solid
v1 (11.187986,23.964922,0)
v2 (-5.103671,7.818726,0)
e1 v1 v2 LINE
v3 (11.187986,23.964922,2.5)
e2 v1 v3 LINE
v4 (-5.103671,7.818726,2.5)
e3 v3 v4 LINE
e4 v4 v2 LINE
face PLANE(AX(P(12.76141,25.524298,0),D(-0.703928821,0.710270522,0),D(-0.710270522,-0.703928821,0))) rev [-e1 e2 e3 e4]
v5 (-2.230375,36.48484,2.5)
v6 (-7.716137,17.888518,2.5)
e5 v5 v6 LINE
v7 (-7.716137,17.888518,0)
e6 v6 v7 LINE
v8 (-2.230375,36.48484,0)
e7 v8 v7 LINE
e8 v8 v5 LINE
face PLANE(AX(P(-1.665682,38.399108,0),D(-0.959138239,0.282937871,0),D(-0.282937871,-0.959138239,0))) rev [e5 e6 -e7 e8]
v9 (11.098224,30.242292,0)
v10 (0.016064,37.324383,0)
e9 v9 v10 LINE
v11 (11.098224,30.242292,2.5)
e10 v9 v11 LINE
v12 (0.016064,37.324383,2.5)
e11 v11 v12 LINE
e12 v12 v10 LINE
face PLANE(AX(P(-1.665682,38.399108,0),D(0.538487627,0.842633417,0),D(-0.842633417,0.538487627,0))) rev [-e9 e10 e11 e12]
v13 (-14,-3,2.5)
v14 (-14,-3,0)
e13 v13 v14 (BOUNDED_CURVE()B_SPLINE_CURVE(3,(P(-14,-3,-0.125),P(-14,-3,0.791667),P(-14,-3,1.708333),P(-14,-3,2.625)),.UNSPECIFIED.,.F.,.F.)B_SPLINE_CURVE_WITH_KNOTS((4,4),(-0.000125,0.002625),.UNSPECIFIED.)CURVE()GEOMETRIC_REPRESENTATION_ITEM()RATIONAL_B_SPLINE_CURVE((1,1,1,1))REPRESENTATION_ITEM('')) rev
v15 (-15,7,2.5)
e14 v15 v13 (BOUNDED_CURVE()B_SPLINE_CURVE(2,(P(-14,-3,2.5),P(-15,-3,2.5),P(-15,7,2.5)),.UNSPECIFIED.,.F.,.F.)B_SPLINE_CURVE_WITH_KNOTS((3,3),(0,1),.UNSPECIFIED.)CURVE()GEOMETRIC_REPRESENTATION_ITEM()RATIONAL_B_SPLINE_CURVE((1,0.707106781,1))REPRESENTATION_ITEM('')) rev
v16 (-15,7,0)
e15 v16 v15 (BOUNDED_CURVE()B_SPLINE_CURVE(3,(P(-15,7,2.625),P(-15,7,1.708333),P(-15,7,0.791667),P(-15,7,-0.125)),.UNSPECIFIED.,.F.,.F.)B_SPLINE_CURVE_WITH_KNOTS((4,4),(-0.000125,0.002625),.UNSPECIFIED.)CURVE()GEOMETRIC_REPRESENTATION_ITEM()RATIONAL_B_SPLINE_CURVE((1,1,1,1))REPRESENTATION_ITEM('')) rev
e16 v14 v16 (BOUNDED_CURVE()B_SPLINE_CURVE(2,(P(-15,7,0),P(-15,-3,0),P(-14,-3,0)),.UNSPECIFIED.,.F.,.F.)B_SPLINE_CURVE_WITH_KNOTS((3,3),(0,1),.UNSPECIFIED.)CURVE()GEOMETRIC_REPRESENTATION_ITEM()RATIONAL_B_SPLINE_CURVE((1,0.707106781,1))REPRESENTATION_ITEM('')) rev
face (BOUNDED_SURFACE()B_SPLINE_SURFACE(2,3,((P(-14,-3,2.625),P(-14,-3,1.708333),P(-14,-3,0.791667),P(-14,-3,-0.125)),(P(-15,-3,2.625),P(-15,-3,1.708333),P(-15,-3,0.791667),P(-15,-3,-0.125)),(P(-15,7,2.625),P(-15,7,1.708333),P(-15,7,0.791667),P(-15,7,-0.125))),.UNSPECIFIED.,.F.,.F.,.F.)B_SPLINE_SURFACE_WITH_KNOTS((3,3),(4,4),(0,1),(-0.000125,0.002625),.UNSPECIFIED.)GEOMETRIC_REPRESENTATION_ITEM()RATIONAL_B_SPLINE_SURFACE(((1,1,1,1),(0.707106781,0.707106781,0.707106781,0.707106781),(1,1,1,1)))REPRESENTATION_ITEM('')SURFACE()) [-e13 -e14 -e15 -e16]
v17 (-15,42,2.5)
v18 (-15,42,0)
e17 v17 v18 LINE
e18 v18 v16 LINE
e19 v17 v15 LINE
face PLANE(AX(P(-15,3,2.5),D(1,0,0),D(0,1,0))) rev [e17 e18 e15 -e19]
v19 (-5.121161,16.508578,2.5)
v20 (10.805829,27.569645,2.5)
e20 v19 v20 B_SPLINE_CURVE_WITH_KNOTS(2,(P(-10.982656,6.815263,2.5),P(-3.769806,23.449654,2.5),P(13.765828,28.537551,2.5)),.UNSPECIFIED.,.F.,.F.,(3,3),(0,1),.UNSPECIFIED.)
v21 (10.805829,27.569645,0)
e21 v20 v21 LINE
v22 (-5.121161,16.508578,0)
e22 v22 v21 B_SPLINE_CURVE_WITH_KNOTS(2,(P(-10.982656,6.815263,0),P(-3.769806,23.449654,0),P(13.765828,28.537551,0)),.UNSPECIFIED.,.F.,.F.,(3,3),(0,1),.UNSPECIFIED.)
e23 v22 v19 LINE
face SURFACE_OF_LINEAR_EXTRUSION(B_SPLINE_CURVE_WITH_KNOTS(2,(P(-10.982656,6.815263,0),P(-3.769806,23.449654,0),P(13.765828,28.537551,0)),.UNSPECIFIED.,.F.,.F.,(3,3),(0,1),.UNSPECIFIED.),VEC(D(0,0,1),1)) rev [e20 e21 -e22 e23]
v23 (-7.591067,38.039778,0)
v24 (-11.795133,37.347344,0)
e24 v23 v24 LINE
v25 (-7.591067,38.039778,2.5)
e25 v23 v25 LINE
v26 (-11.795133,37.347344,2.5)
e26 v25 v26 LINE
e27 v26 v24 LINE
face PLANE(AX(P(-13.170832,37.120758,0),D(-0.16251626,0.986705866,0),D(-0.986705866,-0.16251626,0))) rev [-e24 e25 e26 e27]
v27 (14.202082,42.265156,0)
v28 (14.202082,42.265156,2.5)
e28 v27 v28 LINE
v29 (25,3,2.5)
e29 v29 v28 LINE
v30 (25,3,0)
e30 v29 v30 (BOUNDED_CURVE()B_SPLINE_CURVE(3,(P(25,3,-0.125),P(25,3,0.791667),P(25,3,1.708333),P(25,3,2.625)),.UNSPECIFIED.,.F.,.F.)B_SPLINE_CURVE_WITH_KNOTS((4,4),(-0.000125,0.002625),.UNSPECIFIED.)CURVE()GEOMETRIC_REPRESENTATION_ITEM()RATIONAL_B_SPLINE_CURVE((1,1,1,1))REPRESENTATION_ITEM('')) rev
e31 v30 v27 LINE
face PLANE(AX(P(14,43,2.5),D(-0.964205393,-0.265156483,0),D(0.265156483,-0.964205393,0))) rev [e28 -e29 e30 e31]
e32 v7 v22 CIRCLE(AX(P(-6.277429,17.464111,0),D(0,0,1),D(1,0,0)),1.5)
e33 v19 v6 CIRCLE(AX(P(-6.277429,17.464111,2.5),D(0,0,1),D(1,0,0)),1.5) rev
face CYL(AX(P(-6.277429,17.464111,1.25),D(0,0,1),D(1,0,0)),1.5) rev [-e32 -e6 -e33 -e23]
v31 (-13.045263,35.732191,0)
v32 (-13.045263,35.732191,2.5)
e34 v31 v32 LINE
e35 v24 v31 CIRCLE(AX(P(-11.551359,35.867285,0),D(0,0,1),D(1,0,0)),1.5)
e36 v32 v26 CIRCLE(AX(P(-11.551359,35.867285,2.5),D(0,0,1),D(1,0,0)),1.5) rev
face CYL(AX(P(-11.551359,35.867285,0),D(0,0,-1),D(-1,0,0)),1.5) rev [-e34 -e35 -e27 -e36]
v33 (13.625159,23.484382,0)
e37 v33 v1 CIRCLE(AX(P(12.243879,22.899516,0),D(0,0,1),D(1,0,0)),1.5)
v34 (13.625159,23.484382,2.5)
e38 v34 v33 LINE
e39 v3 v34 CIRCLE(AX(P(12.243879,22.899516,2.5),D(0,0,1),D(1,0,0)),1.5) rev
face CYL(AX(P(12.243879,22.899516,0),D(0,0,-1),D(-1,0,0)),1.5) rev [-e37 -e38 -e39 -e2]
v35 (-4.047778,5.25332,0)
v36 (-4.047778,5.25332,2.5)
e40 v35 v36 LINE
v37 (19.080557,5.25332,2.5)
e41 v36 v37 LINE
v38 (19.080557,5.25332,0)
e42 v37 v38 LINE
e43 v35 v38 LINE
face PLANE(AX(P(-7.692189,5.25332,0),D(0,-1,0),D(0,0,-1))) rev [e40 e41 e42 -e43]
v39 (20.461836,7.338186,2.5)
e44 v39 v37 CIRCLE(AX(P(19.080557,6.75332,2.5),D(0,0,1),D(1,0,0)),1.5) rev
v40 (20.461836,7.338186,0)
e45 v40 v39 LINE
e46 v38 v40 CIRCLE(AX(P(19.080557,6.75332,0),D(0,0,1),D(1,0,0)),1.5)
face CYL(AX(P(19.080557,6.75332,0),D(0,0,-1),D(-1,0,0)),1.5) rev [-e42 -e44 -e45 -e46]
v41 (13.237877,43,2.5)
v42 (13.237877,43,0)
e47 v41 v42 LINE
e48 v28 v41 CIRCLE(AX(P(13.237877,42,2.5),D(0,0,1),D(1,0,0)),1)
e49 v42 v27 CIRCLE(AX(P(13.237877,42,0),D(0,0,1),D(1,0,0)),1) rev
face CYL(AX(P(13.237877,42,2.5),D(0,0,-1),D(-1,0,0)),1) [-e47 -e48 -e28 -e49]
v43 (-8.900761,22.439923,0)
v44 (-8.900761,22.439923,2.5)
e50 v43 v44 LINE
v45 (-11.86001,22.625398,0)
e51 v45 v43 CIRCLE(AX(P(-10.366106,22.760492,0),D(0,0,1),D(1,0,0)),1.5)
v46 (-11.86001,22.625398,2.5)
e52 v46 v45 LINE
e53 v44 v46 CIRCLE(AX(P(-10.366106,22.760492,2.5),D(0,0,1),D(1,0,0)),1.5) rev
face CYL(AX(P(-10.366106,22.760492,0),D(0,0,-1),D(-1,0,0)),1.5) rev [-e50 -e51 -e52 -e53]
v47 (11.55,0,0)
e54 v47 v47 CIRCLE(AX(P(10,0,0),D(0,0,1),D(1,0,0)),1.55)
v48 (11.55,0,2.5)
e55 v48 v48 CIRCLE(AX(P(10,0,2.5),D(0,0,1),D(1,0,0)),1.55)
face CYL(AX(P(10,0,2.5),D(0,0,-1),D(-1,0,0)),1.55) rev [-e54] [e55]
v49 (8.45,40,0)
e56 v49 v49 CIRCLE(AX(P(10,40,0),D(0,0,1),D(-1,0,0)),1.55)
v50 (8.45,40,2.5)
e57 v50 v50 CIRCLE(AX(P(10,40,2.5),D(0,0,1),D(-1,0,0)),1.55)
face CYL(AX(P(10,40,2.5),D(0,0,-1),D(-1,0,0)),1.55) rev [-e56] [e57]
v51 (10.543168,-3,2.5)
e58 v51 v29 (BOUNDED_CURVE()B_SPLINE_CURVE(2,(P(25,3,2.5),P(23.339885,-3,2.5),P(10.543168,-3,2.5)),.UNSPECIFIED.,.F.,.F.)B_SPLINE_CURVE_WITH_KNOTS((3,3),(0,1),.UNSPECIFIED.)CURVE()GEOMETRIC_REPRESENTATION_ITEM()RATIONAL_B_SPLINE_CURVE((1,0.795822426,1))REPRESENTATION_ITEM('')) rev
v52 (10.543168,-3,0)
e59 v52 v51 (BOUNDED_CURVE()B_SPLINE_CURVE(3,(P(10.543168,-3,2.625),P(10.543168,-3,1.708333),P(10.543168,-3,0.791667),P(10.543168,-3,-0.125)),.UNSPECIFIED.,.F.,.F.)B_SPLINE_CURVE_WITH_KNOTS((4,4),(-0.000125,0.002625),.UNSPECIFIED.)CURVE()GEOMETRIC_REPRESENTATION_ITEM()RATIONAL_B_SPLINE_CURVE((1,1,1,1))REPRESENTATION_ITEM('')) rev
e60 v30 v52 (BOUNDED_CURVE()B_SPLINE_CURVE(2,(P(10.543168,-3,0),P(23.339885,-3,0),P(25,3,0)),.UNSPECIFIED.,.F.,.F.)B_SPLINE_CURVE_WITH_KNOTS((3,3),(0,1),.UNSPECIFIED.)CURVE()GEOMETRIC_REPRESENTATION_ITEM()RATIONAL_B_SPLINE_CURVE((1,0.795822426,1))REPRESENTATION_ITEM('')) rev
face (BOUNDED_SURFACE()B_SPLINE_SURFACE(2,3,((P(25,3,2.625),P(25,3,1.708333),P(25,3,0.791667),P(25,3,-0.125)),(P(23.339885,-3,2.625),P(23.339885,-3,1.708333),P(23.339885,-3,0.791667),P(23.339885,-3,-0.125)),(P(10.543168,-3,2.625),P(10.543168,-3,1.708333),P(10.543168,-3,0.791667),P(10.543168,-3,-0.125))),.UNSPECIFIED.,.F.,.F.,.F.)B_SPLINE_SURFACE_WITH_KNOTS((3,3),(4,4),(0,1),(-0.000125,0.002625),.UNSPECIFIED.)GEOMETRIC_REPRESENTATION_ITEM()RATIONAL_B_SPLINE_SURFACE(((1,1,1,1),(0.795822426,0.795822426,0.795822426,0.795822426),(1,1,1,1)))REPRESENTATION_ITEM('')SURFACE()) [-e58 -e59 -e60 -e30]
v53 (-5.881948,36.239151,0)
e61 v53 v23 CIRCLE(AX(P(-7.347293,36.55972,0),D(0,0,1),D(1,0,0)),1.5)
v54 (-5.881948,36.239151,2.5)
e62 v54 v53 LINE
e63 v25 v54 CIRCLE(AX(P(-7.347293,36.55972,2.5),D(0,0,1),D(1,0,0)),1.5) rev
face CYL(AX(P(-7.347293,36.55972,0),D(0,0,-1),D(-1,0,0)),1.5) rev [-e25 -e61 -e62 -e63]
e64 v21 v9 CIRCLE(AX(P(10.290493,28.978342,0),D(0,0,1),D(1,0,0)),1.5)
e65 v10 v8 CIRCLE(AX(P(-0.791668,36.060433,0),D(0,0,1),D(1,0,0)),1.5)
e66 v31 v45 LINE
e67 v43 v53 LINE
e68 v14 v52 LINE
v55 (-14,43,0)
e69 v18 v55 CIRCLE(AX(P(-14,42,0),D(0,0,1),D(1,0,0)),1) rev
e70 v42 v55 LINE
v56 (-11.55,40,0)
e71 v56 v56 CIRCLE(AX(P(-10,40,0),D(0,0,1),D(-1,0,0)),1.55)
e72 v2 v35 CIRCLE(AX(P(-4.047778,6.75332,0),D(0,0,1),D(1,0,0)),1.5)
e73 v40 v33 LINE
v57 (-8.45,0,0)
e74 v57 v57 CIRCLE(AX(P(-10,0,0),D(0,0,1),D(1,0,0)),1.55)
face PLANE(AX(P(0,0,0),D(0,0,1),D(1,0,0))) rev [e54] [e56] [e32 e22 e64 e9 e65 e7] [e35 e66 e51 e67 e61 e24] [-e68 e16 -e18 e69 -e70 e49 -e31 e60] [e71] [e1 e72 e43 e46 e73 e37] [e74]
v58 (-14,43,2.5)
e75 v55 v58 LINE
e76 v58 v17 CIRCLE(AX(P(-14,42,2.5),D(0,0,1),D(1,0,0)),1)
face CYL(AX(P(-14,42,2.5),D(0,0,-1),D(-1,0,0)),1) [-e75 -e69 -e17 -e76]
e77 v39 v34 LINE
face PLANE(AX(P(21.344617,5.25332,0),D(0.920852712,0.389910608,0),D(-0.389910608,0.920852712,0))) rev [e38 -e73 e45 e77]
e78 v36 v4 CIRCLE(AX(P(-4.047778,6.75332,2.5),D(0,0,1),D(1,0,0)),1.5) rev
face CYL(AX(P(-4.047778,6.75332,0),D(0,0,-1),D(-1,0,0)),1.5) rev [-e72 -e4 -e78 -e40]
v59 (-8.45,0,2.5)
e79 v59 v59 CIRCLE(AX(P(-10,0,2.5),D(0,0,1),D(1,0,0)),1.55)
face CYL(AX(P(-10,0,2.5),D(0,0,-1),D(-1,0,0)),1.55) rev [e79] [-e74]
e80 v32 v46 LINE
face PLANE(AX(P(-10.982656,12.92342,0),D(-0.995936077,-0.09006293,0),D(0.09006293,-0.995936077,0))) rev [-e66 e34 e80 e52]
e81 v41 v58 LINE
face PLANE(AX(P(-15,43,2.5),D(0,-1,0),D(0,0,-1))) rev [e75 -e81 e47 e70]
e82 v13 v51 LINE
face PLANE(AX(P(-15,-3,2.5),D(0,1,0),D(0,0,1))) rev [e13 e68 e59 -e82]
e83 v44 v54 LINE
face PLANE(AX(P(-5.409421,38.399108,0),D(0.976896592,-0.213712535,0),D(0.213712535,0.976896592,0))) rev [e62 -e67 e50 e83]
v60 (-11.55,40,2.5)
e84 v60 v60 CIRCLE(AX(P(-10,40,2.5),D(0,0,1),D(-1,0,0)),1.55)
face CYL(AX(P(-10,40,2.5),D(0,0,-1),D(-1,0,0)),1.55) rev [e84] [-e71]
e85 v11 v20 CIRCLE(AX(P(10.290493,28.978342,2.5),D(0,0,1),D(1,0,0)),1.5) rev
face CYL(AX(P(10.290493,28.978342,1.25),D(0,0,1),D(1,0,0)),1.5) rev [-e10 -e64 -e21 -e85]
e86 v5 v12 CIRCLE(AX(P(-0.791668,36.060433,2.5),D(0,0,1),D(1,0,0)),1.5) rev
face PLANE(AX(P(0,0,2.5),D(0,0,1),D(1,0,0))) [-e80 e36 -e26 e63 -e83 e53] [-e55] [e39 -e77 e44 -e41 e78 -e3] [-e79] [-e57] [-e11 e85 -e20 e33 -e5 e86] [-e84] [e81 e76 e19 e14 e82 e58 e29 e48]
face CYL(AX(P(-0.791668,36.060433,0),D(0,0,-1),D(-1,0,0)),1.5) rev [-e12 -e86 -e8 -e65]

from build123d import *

# Parameters (mm, degrees)
SKETCH_1_R          = 1.55
EXTRUDE_1_DEPTH     = 2.5
CUT_EXTRUDE_1_DEPTH = 50.802108389
FILLET_1_R          = 1.5
FILLET_START        = -1
FILLET_2_DEPTH      = 4
FILLET_3_SIZE       = 10
FILLET_3_SIZE_2     = 1
FILLET_4_R          = 1


with BuildPart() as part:
    # 草图1 → 凸台-拉伸1 (new body)
    with BuildSketch(Plane.XY):
        Polygon((-15, 3), (-15, -3), (25, -3), (25, 3), (14, 43), (-15, 43), (-15, 37), align=None)
        with Locations((-10, 0)):
            Circle(SKETCH_1_R, mode=Mode.SUBTRACT)
        with Locations((10, 0)):
            Circle(SKETCH_1_R, mode=Mode.SUBTRACT)
        with Locations(Location((10, 40, 0), (0, 0, 180))):
            Circle(SKETCH_1_R, mode=Mode.SUBTRACT)
        with Locations(Location((-10, 40, 0), (0, 0, 180))):
            Circle(SKETCH_1_R, mode=Mode.SUBTRACT)
    extrude(amount=EXTRUDE_1_DEPTH)

    # 草图2 → 切除-拉伸1 (cut, through all)
    with BuildSketch(Plane.XY.offset(2.5)):
        with BuildLine():
            Line((-1.665681913, 38.399108294), (13.765828269, 28.537551491))
            add(Edge.make_bspline(
                [(-10.982655732, 6.815263357), (-3.769805813, 23.449653824), (13.765828269, 28.537551491)],
                knots=[0, 0, 0, 1, 1, 1], degree=2))
            Line((-10.982655732, 6.815263357), (-1.665681913, 38.399108294))
        make_face()
        Polygon((-13.170831516, 37.120758338), (-5.409421069, 38.399108294), (-10.982655732, 12.923419887), align=None)
        Polygon((-7.692188848, 5.253320152), (21.344617293, 5.253320152), (12.761410447, 25.524298024), align=None)
    extrude(amount=-CUT_EXTRUDE_1_DEPTH, mode=Mode.SUBTRACT)

    # 圆角1
    fillet_1_edges = [part.edges().sort_by_distance(p)[0] for p in [
        (13.765828269, 28.537551491, 1.25),
        (-10.982655732, 6.815263357, 1.25),
        (-1.665681913, 38.399108294, 1.25),
        (21.344617293, 5.253320152, 1.25),
        (-5.409421069, 38.399108294, 1.25),
        (-10.982655732, 12.923419887, 1.25),
        (-13.170831516, 37.120758338, 1.25),
        (-7.692188848, 5.253320152, 1.25),
        (12.761410447, 25.524298024, 1.25),
    ]]
    fillet(fillet_1_edges, radius=FILLET_1_R)

    # 圆角2: read off the stored shape, not the designer's step
    # 圆角2 outline → 圆角2 (cut)
    with BuildSketch(Plane.XY.offset(FILLET_START)):
        with BuildLine():
            Line((25, -3), (25, 3))
            add(Edge.make_bspline(
                [(25, 3), (23.339885287, -3), (10.543167705, -3)],
                knots=[0, 0, 0, 1, 1, 1], degree=2, weights=[1, 0.795822426, 1]))
            Line((10.543167705, -3), (25, -3))
        make_face()
    extrude(amount=FILLET_2_DEPTH, mode=Mode.SUBTRACT)

    # 圆角3
    # a fillet whose section is not a circle: 10, 1 mm, written as the material it takes off along each edge
    with BuildSketch(Plane(origin=(-15, -3, -25), x_dir=(0, 1, 0), z_dir=(0, 0, 1))) as fillet_3_piece_1:
        with BuildLine():
            Bezier((FILLET_3_SIZE, 0), (0, 0), (0, -FILLET_3_SIZE_2), weights=[1, 0.707106781, 1])
            Line((0, -FILLET_3_SIZE_2), (0, 0))
            Line((0, 0), (FILLET_3_SIZE, 0))
        make_face()
    extrude(amount=52.5, mode=Mode.SUBTRACT)

    # 圆角4
    fillet_4_edges = [part.edges().sort_by_distance(p)[0] for p in [
        (14, 43, 1.25),
        (-15, 43, 1.25),
    ]]
    fillet(fillet_4_edges, radius=FILLET_4_R)


solid = part.part
